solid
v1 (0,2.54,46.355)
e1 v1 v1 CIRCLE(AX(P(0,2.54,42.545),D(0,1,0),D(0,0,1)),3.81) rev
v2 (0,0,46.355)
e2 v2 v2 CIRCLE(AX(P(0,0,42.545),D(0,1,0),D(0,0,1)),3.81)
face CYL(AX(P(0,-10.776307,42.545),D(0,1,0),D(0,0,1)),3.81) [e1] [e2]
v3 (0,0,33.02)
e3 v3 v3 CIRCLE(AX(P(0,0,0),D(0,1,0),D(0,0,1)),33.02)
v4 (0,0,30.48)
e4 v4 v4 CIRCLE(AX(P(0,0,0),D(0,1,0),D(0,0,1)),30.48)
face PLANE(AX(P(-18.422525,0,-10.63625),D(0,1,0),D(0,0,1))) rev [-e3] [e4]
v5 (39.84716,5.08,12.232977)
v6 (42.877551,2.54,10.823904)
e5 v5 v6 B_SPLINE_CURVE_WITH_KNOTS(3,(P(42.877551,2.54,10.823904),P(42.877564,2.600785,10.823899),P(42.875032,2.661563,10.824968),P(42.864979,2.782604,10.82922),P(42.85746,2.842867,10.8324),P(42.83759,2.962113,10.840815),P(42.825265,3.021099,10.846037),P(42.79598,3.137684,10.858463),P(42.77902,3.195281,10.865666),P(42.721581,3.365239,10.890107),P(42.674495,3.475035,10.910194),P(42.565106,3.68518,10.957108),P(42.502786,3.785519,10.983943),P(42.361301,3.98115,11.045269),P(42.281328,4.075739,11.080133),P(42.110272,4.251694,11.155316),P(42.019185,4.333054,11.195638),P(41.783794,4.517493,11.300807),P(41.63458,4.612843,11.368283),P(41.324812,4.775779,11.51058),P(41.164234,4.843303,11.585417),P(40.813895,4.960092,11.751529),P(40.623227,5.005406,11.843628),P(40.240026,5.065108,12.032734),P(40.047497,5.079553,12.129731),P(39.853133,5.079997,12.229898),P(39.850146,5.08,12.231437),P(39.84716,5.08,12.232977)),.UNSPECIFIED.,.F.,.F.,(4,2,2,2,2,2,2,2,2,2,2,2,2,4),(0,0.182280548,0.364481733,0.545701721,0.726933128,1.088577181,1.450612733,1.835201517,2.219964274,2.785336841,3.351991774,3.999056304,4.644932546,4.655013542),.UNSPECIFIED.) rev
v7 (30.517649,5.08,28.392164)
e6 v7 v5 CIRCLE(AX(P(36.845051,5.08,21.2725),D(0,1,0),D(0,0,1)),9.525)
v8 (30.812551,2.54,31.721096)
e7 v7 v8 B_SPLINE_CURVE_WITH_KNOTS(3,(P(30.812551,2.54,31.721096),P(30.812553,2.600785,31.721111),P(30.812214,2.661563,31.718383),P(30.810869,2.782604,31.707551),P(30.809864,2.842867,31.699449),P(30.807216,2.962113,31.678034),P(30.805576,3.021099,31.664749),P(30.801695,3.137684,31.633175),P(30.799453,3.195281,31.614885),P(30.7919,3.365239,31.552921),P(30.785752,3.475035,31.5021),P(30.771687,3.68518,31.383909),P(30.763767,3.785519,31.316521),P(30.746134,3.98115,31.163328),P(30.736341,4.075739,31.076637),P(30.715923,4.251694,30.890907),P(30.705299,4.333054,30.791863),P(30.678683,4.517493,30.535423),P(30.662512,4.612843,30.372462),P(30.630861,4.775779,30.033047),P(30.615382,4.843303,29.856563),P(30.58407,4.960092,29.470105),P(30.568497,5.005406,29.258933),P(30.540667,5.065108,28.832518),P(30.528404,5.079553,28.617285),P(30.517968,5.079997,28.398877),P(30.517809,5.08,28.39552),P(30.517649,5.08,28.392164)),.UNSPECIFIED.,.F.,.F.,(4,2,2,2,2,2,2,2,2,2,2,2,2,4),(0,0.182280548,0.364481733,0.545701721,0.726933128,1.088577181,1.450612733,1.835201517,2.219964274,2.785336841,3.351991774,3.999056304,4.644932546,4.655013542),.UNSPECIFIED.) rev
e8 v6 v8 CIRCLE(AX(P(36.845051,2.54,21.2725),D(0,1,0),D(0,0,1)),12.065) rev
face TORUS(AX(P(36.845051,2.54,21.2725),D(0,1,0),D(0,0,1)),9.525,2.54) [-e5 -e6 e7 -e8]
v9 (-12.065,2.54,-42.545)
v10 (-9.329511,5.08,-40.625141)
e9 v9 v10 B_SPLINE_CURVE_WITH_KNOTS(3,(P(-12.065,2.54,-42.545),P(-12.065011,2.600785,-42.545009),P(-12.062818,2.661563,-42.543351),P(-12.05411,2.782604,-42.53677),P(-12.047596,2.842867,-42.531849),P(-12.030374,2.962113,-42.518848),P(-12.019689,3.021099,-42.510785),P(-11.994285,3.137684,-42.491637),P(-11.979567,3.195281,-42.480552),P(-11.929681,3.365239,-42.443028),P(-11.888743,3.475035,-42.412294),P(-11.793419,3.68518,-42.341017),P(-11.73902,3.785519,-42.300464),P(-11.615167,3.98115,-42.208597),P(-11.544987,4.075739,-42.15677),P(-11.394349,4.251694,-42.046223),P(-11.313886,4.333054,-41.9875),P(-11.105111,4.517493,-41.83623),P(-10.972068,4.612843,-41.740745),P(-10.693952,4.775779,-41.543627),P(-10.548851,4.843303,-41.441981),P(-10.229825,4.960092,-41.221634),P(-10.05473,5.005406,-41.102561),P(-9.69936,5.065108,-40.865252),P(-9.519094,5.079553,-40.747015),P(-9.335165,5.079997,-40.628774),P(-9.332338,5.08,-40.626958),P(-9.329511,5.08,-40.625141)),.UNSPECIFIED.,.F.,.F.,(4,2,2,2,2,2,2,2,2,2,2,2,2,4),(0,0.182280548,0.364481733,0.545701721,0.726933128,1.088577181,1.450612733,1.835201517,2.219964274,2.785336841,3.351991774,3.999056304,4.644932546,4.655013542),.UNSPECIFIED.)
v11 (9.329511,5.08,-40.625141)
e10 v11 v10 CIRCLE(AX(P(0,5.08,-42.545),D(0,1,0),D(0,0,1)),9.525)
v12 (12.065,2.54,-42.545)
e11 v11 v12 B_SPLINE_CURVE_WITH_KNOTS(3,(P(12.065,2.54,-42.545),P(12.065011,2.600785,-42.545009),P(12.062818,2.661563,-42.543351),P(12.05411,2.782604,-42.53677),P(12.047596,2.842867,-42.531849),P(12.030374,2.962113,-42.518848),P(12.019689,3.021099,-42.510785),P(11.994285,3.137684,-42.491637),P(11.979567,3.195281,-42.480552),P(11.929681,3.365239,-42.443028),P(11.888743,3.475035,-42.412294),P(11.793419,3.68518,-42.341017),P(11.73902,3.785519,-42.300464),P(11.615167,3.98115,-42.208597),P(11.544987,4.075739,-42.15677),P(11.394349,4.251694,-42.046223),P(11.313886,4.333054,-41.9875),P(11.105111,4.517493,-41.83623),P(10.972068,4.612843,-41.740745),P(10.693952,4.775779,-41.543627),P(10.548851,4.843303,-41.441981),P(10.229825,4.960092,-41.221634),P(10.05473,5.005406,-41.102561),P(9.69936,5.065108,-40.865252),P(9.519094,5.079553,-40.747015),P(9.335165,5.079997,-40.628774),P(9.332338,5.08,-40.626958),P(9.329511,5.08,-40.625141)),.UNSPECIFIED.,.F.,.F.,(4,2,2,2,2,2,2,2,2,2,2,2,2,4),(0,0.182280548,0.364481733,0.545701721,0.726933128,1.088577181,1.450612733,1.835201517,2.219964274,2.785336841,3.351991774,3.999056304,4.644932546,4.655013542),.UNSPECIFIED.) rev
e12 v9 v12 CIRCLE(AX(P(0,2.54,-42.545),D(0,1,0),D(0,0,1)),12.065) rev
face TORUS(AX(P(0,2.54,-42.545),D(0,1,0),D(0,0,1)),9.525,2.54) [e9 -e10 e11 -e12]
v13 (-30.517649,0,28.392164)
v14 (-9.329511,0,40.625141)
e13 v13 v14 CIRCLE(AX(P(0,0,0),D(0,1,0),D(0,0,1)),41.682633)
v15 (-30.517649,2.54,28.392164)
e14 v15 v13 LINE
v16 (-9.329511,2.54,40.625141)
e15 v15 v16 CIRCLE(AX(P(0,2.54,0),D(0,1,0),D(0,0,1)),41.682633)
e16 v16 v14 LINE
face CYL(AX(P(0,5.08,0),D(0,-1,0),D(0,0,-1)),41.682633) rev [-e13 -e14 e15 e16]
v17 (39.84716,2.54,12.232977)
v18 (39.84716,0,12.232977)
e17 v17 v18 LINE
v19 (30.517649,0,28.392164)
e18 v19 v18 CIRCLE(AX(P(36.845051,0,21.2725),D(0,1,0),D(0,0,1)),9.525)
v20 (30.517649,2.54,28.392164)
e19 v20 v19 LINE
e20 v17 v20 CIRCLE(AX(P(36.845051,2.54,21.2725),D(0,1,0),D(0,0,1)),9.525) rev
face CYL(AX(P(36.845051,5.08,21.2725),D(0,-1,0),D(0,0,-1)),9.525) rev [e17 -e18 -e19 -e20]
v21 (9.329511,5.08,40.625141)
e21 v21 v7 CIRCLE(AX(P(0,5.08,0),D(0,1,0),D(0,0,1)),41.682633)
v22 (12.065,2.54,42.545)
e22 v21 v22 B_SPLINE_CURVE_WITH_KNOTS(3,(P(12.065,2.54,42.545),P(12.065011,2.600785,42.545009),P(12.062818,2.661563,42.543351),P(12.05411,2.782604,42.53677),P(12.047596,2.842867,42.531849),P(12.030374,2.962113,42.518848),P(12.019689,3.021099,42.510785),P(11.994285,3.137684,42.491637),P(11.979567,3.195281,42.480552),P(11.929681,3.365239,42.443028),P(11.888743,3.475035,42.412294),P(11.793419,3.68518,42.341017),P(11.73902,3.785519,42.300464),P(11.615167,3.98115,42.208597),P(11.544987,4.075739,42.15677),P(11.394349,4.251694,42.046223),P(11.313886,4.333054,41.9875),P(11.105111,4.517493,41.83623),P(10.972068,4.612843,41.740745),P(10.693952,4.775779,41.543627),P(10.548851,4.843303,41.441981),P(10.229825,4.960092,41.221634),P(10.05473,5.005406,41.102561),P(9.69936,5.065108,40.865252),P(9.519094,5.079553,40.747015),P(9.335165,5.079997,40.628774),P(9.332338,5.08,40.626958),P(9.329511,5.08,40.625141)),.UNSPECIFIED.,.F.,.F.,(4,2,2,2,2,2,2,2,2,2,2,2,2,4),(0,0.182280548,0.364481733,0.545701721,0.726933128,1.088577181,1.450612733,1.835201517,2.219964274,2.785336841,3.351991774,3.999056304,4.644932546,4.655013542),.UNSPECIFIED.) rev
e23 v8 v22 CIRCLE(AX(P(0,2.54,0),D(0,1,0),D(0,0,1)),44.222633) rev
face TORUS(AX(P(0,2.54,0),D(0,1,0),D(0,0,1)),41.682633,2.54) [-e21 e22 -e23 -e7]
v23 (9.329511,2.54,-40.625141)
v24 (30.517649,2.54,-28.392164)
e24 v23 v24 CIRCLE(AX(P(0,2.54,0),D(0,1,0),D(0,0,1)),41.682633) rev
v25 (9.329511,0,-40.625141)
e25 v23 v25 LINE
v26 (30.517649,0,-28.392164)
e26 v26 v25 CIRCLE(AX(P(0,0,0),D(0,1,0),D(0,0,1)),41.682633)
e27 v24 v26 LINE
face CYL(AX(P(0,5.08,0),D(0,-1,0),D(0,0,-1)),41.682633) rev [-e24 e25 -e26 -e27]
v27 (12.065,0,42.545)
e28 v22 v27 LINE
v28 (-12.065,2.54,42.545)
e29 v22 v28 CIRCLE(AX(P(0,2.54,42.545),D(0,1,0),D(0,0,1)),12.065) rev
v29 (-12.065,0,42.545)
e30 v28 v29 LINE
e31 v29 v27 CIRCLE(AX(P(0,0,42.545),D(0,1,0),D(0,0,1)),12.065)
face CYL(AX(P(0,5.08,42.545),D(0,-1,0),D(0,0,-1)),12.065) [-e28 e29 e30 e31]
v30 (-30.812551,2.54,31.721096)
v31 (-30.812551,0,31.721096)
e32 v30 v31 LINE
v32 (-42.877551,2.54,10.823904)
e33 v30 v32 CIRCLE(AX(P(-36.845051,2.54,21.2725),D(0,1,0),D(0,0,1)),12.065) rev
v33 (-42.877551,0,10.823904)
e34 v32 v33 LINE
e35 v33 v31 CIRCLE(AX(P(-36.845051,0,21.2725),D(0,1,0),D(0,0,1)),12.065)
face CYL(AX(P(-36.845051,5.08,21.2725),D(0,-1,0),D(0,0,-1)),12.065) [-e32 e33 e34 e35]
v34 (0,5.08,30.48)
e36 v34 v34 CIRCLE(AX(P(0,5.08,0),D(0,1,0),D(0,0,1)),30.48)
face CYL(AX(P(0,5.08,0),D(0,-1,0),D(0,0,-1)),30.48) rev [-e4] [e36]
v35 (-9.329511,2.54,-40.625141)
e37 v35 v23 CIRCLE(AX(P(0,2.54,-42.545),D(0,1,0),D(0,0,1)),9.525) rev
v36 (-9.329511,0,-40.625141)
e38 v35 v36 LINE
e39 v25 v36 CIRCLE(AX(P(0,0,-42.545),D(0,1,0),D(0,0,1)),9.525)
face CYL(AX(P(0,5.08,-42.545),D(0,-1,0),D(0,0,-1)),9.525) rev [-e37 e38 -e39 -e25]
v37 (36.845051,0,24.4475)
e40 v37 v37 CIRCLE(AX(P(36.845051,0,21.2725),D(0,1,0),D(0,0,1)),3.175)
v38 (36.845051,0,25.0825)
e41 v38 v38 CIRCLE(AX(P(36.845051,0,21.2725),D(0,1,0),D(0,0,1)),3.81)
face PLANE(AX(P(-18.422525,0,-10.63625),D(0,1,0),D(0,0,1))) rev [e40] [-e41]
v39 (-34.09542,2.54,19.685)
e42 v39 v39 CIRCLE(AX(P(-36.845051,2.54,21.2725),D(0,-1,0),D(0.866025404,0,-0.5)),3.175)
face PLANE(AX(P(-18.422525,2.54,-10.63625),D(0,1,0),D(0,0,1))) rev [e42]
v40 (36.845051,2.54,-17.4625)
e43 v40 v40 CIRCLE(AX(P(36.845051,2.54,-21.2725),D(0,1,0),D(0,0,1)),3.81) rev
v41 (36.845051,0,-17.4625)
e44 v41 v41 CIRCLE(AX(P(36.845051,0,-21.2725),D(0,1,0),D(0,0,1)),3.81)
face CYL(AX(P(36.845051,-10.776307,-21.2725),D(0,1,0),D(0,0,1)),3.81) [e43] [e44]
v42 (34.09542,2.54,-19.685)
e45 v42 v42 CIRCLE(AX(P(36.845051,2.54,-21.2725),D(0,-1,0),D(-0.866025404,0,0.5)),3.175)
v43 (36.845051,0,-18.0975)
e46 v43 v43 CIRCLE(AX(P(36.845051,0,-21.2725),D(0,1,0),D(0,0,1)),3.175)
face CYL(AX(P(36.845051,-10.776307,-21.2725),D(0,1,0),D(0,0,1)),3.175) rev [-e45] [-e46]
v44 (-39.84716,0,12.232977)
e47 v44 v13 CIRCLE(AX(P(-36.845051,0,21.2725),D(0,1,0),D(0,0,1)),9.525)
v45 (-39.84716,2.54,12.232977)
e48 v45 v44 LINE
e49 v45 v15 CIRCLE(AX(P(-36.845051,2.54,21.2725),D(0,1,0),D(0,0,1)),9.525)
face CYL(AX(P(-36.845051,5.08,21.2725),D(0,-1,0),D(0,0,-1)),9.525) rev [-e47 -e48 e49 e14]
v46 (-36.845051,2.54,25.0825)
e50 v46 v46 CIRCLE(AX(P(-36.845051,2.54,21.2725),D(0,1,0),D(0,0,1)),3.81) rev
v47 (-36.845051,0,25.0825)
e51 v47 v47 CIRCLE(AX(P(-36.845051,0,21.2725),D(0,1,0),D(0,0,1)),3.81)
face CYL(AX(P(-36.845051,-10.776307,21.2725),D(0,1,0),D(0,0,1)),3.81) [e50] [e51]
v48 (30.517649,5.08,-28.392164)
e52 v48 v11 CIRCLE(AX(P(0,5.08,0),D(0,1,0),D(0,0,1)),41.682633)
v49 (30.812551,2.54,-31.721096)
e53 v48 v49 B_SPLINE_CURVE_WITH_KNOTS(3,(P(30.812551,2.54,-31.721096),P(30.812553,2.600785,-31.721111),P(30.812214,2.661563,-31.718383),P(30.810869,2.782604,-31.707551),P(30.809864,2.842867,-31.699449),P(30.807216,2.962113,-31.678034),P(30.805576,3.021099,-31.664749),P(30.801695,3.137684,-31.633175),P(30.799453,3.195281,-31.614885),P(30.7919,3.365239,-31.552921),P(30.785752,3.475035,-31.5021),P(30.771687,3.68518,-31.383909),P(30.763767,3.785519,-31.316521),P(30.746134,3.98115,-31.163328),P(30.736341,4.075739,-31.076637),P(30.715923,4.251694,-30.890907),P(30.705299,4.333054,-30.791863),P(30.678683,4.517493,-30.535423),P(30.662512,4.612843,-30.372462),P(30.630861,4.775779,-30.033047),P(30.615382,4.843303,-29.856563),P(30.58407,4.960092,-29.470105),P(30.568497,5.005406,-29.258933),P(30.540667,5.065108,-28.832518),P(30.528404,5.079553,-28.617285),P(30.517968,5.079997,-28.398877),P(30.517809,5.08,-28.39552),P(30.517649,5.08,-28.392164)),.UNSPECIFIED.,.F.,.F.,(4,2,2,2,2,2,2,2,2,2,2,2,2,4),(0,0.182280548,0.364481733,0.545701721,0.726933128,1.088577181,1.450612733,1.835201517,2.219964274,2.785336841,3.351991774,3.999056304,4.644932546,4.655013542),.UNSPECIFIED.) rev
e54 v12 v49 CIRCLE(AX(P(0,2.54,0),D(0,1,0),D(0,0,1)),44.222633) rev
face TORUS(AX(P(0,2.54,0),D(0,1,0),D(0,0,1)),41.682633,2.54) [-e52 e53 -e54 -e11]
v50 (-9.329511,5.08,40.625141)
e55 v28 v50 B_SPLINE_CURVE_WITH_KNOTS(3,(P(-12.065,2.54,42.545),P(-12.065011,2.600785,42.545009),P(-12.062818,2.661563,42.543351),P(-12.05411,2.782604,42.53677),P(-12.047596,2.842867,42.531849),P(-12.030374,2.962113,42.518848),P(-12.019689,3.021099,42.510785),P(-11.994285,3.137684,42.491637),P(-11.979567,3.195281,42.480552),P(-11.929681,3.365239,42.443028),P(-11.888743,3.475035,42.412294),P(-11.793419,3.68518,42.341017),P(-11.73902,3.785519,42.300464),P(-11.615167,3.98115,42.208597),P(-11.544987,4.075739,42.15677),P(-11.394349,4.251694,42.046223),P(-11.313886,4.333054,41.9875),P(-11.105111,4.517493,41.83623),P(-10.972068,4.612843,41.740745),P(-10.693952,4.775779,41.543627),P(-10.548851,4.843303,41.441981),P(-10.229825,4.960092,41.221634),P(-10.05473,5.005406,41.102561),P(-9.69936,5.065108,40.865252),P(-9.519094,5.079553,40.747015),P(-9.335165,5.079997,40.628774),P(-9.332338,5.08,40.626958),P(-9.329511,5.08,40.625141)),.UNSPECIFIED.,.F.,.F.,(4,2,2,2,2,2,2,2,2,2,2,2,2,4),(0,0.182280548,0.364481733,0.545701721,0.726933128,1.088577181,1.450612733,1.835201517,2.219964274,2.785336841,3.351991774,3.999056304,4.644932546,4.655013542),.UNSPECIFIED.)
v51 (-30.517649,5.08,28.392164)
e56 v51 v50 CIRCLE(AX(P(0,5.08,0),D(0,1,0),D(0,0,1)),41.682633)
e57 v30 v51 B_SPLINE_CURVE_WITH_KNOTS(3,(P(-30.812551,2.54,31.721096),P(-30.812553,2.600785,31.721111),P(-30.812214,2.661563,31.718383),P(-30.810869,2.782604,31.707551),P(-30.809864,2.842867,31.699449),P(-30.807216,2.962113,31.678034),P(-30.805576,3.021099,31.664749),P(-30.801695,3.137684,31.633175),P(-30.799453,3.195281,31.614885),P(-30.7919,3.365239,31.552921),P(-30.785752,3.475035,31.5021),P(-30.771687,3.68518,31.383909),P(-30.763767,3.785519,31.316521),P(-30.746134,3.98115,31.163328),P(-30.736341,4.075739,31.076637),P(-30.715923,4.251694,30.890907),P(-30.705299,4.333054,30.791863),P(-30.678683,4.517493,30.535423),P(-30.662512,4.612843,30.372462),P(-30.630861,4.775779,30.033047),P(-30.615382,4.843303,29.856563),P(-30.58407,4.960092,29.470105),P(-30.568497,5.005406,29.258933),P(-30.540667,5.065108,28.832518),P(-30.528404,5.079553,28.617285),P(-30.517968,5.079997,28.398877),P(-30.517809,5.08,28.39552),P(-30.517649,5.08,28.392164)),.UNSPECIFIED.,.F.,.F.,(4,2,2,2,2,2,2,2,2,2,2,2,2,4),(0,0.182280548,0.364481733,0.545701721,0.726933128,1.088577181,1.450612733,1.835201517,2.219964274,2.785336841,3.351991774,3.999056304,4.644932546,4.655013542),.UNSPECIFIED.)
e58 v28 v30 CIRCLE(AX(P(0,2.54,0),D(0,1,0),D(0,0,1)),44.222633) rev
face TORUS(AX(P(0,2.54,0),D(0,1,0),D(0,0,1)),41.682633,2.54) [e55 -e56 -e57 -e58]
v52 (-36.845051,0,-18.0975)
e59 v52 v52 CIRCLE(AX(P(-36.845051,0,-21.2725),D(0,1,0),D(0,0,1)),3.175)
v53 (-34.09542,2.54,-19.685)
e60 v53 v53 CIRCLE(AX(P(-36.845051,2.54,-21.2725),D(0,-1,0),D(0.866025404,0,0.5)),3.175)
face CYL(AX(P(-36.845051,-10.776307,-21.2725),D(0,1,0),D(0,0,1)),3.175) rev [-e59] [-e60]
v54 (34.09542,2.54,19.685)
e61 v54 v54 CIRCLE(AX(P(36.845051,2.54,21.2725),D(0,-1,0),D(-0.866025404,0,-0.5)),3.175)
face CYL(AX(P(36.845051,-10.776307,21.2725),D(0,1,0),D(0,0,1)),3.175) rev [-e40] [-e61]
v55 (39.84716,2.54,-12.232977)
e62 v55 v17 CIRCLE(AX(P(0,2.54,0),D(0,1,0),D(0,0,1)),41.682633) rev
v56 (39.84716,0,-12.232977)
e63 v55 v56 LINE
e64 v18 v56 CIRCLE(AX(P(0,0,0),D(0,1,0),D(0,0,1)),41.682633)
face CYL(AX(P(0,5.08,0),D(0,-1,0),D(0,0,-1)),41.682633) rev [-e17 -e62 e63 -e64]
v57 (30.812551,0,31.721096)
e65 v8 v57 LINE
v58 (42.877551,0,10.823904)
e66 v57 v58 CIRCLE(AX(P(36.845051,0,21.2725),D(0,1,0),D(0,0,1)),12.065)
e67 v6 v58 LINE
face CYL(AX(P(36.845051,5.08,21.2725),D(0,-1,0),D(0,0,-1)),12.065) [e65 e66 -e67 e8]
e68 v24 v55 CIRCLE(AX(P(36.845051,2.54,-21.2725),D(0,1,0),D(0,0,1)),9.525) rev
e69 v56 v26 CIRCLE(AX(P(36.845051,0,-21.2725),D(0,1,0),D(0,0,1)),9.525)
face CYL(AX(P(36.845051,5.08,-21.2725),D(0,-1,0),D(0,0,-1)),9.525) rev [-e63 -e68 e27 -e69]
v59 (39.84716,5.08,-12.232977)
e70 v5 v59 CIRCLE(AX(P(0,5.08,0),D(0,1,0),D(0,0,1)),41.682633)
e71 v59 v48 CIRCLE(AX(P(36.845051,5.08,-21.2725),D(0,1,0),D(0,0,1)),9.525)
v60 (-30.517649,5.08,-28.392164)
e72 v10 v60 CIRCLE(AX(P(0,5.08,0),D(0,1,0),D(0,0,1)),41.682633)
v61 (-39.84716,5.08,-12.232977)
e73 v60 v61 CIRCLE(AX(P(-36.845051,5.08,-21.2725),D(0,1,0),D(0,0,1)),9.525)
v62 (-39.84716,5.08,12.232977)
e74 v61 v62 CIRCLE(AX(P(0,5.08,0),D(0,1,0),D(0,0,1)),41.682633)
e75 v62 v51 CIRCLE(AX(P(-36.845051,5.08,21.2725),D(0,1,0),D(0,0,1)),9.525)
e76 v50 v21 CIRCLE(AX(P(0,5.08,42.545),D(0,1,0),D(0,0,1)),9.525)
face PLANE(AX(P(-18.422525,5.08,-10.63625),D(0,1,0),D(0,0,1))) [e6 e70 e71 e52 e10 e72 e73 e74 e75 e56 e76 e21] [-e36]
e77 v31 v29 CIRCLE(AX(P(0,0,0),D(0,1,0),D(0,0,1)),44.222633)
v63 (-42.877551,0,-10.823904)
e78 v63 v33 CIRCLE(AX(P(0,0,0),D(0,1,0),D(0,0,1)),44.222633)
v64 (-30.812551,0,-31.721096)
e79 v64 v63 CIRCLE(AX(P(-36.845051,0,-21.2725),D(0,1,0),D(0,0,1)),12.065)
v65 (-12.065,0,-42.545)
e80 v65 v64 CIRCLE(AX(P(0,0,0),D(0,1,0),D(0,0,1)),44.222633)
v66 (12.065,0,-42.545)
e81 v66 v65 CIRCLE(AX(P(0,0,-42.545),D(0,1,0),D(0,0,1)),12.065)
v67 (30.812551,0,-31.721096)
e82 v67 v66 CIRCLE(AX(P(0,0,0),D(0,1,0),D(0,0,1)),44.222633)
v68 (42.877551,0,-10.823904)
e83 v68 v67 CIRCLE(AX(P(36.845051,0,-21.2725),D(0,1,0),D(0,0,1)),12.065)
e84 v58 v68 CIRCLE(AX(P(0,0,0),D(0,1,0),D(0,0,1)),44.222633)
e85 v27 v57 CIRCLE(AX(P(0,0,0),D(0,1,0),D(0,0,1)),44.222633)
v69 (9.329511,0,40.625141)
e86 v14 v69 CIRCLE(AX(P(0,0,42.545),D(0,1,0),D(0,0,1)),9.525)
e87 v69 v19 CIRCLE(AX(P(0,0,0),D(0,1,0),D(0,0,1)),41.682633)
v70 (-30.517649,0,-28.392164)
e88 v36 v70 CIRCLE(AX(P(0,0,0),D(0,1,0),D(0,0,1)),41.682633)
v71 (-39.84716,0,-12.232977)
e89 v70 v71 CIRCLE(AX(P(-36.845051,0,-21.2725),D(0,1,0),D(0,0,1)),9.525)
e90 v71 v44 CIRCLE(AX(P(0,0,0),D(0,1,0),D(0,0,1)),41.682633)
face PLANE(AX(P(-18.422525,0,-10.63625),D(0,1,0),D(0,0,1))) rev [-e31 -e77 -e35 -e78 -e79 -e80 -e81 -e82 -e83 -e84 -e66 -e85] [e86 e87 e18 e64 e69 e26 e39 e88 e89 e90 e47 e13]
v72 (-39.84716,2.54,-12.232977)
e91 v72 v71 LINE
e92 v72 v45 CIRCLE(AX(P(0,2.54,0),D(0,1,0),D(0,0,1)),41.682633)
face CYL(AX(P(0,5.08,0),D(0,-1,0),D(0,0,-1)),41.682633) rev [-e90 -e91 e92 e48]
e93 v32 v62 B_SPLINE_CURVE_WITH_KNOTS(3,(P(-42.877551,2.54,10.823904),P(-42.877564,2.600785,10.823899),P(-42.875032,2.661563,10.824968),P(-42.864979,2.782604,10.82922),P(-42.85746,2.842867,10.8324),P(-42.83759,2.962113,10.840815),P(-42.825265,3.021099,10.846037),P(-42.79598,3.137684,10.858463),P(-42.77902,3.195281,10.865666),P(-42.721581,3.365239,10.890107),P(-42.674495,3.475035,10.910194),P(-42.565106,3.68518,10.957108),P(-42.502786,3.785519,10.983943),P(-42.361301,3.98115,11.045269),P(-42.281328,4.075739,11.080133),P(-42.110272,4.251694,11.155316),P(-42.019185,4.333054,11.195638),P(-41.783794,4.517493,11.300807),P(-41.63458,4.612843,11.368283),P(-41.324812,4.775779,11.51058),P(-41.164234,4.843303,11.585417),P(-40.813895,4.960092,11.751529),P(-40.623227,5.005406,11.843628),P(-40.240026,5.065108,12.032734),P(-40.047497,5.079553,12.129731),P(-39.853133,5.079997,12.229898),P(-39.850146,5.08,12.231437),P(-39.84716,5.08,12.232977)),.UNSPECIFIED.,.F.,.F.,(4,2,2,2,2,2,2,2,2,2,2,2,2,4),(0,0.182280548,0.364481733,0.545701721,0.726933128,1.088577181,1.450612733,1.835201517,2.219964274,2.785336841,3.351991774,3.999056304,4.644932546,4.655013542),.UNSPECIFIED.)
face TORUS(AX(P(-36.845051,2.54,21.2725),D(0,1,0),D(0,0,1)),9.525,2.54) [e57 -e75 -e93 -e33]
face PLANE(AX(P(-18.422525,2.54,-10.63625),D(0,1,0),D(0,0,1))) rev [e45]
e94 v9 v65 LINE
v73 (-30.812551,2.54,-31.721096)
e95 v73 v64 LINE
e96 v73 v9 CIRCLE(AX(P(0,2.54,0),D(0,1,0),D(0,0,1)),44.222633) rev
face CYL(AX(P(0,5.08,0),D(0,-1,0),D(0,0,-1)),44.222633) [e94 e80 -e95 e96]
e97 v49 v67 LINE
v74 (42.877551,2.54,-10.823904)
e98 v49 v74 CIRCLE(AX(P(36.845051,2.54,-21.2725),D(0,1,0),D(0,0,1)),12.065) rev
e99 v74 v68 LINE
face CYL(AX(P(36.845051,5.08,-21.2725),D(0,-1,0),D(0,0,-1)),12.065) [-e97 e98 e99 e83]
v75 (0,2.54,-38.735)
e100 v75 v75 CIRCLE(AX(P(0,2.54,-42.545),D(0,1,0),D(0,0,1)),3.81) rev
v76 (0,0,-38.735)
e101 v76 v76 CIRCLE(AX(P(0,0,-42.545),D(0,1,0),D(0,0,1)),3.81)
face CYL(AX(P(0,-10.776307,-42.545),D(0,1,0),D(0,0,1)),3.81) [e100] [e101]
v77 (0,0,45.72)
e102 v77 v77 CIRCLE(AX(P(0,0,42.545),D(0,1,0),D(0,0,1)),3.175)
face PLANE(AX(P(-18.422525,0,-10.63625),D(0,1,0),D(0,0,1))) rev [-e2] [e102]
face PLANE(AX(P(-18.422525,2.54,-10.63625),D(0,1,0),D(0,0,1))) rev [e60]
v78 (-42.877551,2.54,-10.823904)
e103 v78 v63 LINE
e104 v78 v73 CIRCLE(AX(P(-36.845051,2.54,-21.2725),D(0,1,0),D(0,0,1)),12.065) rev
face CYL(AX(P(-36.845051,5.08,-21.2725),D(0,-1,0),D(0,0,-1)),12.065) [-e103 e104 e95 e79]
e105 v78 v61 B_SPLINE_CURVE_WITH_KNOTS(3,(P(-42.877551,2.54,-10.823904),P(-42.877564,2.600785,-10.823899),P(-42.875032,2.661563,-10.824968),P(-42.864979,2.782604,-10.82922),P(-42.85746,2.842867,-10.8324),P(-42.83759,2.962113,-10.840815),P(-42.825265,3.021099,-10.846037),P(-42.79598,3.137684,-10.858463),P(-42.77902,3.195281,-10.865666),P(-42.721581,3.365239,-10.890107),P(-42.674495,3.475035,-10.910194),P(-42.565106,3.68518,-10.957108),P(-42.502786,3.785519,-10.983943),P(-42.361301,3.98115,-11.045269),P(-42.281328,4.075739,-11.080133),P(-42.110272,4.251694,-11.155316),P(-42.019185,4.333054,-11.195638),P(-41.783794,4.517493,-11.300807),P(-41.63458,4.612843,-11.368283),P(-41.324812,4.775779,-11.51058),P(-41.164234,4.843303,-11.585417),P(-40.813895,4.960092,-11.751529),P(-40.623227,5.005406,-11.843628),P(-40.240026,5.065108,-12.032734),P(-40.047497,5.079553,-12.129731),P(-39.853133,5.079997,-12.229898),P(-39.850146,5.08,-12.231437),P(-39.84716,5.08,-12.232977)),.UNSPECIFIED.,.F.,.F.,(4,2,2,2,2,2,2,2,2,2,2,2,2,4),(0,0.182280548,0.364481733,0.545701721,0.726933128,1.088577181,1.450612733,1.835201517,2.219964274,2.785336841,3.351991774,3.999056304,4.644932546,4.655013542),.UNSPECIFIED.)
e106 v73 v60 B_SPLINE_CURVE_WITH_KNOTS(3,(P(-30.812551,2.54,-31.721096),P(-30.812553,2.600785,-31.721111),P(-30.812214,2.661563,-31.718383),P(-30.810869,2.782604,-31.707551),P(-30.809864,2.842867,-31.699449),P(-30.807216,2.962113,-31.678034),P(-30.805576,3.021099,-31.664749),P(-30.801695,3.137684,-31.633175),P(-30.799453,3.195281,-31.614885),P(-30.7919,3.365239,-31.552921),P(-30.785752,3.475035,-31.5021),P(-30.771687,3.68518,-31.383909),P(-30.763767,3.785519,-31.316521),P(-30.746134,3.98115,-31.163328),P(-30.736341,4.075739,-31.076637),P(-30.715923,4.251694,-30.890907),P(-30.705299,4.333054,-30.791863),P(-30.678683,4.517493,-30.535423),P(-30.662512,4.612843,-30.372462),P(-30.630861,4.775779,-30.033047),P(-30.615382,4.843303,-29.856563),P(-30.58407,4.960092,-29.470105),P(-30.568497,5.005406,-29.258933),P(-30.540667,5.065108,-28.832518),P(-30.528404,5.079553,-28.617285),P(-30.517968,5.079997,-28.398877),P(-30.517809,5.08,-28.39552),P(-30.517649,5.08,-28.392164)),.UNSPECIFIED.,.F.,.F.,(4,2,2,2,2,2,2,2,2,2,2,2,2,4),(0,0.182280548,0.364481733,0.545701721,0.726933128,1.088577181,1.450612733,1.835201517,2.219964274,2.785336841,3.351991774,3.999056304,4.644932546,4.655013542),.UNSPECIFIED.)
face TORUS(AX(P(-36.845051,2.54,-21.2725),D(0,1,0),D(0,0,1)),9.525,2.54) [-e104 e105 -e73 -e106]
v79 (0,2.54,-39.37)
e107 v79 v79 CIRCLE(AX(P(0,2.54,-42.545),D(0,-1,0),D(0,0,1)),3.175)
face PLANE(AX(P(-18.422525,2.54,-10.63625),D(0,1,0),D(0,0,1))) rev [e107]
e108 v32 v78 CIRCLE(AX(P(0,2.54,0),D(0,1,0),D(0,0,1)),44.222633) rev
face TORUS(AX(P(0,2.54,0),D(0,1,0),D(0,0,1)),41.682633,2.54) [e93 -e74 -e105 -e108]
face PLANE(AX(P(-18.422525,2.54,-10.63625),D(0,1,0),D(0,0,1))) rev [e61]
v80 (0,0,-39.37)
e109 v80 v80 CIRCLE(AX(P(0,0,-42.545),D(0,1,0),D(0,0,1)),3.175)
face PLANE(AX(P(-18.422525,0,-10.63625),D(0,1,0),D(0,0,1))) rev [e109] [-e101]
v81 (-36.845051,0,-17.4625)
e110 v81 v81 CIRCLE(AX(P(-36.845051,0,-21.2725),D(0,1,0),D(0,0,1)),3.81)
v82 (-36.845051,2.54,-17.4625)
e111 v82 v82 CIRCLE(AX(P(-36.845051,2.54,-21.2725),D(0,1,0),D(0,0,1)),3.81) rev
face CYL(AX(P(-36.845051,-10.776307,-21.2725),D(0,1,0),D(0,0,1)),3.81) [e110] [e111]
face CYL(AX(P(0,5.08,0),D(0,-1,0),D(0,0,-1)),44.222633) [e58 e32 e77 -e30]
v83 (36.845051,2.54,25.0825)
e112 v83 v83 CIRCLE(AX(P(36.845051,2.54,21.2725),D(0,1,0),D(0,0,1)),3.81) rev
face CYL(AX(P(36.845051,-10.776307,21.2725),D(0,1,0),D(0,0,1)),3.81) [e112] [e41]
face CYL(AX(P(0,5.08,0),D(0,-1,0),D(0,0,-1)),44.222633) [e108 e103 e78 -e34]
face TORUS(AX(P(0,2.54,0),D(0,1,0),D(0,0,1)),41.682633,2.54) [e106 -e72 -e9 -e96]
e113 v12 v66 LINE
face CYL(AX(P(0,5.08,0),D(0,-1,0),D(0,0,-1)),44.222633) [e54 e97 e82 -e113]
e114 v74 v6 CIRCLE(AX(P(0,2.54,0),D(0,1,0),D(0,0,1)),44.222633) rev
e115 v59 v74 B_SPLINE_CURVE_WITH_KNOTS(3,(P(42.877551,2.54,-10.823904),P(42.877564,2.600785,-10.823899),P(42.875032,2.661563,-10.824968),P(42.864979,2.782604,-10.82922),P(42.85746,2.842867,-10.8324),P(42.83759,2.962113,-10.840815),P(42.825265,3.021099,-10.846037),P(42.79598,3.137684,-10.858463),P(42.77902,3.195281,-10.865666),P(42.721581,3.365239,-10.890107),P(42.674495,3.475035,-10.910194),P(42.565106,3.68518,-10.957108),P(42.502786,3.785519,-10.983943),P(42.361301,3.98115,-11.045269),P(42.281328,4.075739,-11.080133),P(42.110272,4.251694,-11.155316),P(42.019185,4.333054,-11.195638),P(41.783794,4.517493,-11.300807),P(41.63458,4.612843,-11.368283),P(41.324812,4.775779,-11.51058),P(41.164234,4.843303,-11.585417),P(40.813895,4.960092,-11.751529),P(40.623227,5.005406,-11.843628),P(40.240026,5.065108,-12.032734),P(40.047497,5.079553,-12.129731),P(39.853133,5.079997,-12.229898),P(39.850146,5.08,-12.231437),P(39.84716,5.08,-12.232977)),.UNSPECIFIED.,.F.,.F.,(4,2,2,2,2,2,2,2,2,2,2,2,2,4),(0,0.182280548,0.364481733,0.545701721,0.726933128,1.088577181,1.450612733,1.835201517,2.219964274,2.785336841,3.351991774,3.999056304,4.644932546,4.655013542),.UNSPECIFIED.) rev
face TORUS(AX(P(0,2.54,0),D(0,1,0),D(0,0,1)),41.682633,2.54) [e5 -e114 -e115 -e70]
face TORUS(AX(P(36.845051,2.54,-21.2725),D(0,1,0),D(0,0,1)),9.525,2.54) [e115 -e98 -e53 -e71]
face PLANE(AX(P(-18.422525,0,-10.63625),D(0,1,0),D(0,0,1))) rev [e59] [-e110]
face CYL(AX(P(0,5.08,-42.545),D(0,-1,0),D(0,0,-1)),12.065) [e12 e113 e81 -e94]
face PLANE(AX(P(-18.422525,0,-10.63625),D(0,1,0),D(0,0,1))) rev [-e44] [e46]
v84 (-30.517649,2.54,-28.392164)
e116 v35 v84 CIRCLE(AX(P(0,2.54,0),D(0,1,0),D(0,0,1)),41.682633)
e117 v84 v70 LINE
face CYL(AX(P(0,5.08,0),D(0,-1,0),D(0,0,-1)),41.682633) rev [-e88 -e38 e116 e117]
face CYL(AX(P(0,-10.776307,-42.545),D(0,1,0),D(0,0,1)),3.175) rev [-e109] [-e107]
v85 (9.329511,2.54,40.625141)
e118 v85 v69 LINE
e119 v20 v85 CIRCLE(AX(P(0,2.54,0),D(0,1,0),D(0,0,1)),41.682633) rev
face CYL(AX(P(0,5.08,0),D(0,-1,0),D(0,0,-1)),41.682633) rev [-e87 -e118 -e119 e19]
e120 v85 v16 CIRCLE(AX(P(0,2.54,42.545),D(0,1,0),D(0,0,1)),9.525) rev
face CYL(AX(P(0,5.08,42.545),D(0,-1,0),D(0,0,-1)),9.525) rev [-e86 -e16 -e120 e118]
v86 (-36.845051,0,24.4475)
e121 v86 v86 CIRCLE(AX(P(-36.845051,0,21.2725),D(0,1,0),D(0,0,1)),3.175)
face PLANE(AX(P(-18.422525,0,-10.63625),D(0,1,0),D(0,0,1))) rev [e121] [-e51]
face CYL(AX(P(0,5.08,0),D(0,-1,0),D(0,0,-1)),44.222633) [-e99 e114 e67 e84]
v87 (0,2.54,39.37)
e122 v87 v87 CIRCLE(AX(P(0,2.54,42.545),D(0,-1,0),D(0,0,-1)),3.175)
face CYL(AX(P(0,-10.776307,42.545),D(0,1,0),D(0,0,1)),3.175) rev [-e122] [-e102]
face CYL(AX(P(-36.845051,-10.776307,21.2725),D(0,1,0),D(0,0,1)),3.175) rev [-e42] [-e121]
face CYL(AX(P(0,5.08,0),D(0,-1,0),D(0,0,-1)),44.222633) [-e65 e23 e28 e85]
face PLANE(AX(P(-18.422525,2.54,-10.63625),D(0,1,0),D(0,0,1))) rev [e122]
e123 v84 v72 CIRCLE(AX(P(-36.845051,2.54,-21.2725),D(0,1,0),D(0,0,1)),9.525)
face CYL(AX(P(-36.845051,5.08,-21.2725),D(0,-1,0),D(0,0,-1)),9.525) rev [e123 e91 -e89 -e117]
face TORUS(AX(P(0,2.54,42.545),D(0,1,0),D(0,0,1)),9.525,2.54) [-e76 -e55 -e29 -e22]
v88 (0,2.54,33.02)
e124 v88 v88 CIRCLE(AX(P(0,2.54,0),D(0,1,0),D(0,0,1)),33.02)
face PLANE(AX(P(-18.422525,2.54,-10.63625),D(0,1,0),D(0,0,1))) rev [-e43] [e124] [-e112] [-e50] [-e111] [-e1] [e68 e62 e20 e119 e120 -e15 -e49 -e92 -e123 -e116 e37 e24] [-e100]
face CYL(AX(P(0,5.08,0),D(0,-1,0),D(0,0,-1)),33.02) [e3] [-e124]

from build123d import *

# Parameters (mm, degrees)
SKETCH1_R           = 30.48
BOSS_EXTRUDE1_DEPTH = 5.08
FILLET1_R           = 2.54
SHELL1_OUTLINE_R    = 33.02
SHELL1_DEPTH        = 2.54
SKETCH2_R           = 3.81
SKETCH2_R_2         = 3.175
BOSS_EXTRUDE2_DEPTH = 2.54
CIRPATTERN1_COUNT   = 6


# Read off the part's stored shape, not the designer's step: Shell1
with BuildPart() as part:
    # Sketch1 → Boss-Extrude1 (new body)
    with BuildSketch(Plane(origin=(0, 0, 0), x_dir=(1, 0, 0), z_dir=(0, 1, 0))):
        with BuildLine():
            ThreePointArc((12.065, 42.545), (0, 54.61), (-12.065, 42.545))
            ThreePointArc((-12.065, 42.545), (-22.11131639, 38.29792341), (-30.812550804, 31.721096497))
            ThreePointArc((-30.812550804, 31.721096497), (-47.293647301, 27.305), (-42.877550804, 10.823903503))
            ThreePointArc((-42.877550804, 10.823903503), (-44.22263278, 0), (-42.877550804, -10.823903503))
            ThreePointArc((-42.877550804, -10.823903503), (-47.293647301, -27.305), (-30.812550804, -31.721096497))
            ThreePointArc((-30.812550804, -31.721096497), (-22.11131639, -38.29792341), (-12.065, -42.545))
            ThreePointArc((-12.065, -42.545), (0, -54.61), (12.065, -42.545))
            ThreePointArc((12.065, -42.545), (22.11131639, -38.29792341), (30.812550804, -31.721096497))
            ThreePointArc((30.812550804, -31.721096497), (47.293647301, -27.305), (42.877550804, -10.823903503))
            ThreePointArc((42.877550804, -10.823903503), (44.22263278, 0), (42.877550804, 10.823903503))
            ThreePointArc((42.877550804, 10.823903503), (47.293647301, 27.305), (30.812550804, 31.721096497))
            ThreePointArc((30.812550804, 31.721096497), (22.11131639, 38.29792341), (12.065, 42.545))
        make_face()
        with Locations(Location((0, 0, 0), (0, 0, 270))):
            Circle(SKETCH1_R, mode=Mode.SUBTRACT)
    extrude(amount=BOSS_EXTRUDE1_DEPTH)

    # Fillet1
    fillet1_edges = [part.edges().sort_by_distance(p)[0] for p in [
        (-44.22263278, 5.08, 0),
        (-47.293647301, 5.08, 27.305),
        (-22.11131639, 5.08, 38.29792341),
        (0, 5.08, 54.61),
        (22.11131639, 5.08, 38.29792341),
        (47.293647301, 5.08, 27.305),
        (44.22263278, 5.08, 0),
        (47.293647301, 5.08, -27.305),
        (22.11131639, 5.08, -38.29792341),
        (0, 5.08, -54.61),
        (-22.11131639, 5.08, -38.29792341),
        (-47.293647301, 5.08, -27.305),
    ]]
    fillet(fillet1_edges, radius=FILLET1_R)

    # Shell1 outline → Shell1 (cut)
    with BuildSketch(Plane(origin=(0, 0, 0), x_dir=(1, 0, 0), z_dir=(0, 1, 0))):
        with BuildLine():
            ThreePointArc((-9.329510581, 40.625141327), (-20.84131639, 36.098218884), (-30.517649131, 28.392163831))
            ThreePointArc((-30.517649131, 28.392163831), (-45.093942775, 26.035), (-39.847159711, 12.232977496))
            ThreePointArc((-39.847159711, 12.232977496), (-41.68263278, 0), (-39.847159711, -12.232977496))
            ThreePointArc((-39.847159711, -12.232977496), (-45.093942775, -26.035), (-30.517649131, -28.392163831))
            ThreePointArc((-30.517649131, -28.392163831), (-20.84131639, -36.098218884), (-9.329510581, -40.625141327))
            ThreePointArc((-9.329510581, -40.625141327), (0, -52.07), (9.329510581, -40.625141327))
            ThreePointArc((9.329510581, -40.625141327), (20.84131639, -36.098218884), (30.517649131, -28.392163831))
            ThreePointArc((30.517649131, -28.392163831), (45.093942775, -26.035), (39.847159711, -12.232977496))
            ThreePointArc((39.847159711, -12.232977496), (41.68263278, 0), (39.847159711, 12.232977496))
            ThreePointArc((39.847159711, 12.232977496), (45.093942775, 26.035), (30.517649131, 28.392163831))
            ThreePointArc((30.517649131, 28.392163831), (20.84131639, 36.098218884), (9.329510581, 40.625141327))
            ThreePointArc((9.329510581, 40.625141327), (0, 52.07), (-9.329510581, 40.625141327))
        make_face()
        Circle(SHELL1_OUTLINE_R, mode=Mode.SUBTRACT)
    extrude(amount=SHELL1_DEPTH, mode=Mode.SUBTRACT)

    # Sketch2 → Boss-Extrude2 (add)
    with BuildSketch(Plane.XZ.offset(-2.54)):
        with Locations(Location((0, 42.545, 0), (0, 0, 90))):
            Circle(SKETCH2_R)
        with Locations(Location((0, 42.545, 0), (0, 0, 90))):
            Circle(SKETCH2_R_2, mode=Mode.SUBTRACT)
    boss_extrude2 = extrude(amount=BOSS_EXTRUDE2_DEPTH)

    # CirPattern1: Boss-Extrude2 ×6 about axis
    cirpattern1_axis = Axis((0, 0, 0), (0, 1, 0))
    for i in range(1, CIRPATTERN1_COUNT):
        add(boss_extrude2.rotate(cirpattern1_axis, i * 360 / CIRPATTERN1_COUNT))


solid = part.part
